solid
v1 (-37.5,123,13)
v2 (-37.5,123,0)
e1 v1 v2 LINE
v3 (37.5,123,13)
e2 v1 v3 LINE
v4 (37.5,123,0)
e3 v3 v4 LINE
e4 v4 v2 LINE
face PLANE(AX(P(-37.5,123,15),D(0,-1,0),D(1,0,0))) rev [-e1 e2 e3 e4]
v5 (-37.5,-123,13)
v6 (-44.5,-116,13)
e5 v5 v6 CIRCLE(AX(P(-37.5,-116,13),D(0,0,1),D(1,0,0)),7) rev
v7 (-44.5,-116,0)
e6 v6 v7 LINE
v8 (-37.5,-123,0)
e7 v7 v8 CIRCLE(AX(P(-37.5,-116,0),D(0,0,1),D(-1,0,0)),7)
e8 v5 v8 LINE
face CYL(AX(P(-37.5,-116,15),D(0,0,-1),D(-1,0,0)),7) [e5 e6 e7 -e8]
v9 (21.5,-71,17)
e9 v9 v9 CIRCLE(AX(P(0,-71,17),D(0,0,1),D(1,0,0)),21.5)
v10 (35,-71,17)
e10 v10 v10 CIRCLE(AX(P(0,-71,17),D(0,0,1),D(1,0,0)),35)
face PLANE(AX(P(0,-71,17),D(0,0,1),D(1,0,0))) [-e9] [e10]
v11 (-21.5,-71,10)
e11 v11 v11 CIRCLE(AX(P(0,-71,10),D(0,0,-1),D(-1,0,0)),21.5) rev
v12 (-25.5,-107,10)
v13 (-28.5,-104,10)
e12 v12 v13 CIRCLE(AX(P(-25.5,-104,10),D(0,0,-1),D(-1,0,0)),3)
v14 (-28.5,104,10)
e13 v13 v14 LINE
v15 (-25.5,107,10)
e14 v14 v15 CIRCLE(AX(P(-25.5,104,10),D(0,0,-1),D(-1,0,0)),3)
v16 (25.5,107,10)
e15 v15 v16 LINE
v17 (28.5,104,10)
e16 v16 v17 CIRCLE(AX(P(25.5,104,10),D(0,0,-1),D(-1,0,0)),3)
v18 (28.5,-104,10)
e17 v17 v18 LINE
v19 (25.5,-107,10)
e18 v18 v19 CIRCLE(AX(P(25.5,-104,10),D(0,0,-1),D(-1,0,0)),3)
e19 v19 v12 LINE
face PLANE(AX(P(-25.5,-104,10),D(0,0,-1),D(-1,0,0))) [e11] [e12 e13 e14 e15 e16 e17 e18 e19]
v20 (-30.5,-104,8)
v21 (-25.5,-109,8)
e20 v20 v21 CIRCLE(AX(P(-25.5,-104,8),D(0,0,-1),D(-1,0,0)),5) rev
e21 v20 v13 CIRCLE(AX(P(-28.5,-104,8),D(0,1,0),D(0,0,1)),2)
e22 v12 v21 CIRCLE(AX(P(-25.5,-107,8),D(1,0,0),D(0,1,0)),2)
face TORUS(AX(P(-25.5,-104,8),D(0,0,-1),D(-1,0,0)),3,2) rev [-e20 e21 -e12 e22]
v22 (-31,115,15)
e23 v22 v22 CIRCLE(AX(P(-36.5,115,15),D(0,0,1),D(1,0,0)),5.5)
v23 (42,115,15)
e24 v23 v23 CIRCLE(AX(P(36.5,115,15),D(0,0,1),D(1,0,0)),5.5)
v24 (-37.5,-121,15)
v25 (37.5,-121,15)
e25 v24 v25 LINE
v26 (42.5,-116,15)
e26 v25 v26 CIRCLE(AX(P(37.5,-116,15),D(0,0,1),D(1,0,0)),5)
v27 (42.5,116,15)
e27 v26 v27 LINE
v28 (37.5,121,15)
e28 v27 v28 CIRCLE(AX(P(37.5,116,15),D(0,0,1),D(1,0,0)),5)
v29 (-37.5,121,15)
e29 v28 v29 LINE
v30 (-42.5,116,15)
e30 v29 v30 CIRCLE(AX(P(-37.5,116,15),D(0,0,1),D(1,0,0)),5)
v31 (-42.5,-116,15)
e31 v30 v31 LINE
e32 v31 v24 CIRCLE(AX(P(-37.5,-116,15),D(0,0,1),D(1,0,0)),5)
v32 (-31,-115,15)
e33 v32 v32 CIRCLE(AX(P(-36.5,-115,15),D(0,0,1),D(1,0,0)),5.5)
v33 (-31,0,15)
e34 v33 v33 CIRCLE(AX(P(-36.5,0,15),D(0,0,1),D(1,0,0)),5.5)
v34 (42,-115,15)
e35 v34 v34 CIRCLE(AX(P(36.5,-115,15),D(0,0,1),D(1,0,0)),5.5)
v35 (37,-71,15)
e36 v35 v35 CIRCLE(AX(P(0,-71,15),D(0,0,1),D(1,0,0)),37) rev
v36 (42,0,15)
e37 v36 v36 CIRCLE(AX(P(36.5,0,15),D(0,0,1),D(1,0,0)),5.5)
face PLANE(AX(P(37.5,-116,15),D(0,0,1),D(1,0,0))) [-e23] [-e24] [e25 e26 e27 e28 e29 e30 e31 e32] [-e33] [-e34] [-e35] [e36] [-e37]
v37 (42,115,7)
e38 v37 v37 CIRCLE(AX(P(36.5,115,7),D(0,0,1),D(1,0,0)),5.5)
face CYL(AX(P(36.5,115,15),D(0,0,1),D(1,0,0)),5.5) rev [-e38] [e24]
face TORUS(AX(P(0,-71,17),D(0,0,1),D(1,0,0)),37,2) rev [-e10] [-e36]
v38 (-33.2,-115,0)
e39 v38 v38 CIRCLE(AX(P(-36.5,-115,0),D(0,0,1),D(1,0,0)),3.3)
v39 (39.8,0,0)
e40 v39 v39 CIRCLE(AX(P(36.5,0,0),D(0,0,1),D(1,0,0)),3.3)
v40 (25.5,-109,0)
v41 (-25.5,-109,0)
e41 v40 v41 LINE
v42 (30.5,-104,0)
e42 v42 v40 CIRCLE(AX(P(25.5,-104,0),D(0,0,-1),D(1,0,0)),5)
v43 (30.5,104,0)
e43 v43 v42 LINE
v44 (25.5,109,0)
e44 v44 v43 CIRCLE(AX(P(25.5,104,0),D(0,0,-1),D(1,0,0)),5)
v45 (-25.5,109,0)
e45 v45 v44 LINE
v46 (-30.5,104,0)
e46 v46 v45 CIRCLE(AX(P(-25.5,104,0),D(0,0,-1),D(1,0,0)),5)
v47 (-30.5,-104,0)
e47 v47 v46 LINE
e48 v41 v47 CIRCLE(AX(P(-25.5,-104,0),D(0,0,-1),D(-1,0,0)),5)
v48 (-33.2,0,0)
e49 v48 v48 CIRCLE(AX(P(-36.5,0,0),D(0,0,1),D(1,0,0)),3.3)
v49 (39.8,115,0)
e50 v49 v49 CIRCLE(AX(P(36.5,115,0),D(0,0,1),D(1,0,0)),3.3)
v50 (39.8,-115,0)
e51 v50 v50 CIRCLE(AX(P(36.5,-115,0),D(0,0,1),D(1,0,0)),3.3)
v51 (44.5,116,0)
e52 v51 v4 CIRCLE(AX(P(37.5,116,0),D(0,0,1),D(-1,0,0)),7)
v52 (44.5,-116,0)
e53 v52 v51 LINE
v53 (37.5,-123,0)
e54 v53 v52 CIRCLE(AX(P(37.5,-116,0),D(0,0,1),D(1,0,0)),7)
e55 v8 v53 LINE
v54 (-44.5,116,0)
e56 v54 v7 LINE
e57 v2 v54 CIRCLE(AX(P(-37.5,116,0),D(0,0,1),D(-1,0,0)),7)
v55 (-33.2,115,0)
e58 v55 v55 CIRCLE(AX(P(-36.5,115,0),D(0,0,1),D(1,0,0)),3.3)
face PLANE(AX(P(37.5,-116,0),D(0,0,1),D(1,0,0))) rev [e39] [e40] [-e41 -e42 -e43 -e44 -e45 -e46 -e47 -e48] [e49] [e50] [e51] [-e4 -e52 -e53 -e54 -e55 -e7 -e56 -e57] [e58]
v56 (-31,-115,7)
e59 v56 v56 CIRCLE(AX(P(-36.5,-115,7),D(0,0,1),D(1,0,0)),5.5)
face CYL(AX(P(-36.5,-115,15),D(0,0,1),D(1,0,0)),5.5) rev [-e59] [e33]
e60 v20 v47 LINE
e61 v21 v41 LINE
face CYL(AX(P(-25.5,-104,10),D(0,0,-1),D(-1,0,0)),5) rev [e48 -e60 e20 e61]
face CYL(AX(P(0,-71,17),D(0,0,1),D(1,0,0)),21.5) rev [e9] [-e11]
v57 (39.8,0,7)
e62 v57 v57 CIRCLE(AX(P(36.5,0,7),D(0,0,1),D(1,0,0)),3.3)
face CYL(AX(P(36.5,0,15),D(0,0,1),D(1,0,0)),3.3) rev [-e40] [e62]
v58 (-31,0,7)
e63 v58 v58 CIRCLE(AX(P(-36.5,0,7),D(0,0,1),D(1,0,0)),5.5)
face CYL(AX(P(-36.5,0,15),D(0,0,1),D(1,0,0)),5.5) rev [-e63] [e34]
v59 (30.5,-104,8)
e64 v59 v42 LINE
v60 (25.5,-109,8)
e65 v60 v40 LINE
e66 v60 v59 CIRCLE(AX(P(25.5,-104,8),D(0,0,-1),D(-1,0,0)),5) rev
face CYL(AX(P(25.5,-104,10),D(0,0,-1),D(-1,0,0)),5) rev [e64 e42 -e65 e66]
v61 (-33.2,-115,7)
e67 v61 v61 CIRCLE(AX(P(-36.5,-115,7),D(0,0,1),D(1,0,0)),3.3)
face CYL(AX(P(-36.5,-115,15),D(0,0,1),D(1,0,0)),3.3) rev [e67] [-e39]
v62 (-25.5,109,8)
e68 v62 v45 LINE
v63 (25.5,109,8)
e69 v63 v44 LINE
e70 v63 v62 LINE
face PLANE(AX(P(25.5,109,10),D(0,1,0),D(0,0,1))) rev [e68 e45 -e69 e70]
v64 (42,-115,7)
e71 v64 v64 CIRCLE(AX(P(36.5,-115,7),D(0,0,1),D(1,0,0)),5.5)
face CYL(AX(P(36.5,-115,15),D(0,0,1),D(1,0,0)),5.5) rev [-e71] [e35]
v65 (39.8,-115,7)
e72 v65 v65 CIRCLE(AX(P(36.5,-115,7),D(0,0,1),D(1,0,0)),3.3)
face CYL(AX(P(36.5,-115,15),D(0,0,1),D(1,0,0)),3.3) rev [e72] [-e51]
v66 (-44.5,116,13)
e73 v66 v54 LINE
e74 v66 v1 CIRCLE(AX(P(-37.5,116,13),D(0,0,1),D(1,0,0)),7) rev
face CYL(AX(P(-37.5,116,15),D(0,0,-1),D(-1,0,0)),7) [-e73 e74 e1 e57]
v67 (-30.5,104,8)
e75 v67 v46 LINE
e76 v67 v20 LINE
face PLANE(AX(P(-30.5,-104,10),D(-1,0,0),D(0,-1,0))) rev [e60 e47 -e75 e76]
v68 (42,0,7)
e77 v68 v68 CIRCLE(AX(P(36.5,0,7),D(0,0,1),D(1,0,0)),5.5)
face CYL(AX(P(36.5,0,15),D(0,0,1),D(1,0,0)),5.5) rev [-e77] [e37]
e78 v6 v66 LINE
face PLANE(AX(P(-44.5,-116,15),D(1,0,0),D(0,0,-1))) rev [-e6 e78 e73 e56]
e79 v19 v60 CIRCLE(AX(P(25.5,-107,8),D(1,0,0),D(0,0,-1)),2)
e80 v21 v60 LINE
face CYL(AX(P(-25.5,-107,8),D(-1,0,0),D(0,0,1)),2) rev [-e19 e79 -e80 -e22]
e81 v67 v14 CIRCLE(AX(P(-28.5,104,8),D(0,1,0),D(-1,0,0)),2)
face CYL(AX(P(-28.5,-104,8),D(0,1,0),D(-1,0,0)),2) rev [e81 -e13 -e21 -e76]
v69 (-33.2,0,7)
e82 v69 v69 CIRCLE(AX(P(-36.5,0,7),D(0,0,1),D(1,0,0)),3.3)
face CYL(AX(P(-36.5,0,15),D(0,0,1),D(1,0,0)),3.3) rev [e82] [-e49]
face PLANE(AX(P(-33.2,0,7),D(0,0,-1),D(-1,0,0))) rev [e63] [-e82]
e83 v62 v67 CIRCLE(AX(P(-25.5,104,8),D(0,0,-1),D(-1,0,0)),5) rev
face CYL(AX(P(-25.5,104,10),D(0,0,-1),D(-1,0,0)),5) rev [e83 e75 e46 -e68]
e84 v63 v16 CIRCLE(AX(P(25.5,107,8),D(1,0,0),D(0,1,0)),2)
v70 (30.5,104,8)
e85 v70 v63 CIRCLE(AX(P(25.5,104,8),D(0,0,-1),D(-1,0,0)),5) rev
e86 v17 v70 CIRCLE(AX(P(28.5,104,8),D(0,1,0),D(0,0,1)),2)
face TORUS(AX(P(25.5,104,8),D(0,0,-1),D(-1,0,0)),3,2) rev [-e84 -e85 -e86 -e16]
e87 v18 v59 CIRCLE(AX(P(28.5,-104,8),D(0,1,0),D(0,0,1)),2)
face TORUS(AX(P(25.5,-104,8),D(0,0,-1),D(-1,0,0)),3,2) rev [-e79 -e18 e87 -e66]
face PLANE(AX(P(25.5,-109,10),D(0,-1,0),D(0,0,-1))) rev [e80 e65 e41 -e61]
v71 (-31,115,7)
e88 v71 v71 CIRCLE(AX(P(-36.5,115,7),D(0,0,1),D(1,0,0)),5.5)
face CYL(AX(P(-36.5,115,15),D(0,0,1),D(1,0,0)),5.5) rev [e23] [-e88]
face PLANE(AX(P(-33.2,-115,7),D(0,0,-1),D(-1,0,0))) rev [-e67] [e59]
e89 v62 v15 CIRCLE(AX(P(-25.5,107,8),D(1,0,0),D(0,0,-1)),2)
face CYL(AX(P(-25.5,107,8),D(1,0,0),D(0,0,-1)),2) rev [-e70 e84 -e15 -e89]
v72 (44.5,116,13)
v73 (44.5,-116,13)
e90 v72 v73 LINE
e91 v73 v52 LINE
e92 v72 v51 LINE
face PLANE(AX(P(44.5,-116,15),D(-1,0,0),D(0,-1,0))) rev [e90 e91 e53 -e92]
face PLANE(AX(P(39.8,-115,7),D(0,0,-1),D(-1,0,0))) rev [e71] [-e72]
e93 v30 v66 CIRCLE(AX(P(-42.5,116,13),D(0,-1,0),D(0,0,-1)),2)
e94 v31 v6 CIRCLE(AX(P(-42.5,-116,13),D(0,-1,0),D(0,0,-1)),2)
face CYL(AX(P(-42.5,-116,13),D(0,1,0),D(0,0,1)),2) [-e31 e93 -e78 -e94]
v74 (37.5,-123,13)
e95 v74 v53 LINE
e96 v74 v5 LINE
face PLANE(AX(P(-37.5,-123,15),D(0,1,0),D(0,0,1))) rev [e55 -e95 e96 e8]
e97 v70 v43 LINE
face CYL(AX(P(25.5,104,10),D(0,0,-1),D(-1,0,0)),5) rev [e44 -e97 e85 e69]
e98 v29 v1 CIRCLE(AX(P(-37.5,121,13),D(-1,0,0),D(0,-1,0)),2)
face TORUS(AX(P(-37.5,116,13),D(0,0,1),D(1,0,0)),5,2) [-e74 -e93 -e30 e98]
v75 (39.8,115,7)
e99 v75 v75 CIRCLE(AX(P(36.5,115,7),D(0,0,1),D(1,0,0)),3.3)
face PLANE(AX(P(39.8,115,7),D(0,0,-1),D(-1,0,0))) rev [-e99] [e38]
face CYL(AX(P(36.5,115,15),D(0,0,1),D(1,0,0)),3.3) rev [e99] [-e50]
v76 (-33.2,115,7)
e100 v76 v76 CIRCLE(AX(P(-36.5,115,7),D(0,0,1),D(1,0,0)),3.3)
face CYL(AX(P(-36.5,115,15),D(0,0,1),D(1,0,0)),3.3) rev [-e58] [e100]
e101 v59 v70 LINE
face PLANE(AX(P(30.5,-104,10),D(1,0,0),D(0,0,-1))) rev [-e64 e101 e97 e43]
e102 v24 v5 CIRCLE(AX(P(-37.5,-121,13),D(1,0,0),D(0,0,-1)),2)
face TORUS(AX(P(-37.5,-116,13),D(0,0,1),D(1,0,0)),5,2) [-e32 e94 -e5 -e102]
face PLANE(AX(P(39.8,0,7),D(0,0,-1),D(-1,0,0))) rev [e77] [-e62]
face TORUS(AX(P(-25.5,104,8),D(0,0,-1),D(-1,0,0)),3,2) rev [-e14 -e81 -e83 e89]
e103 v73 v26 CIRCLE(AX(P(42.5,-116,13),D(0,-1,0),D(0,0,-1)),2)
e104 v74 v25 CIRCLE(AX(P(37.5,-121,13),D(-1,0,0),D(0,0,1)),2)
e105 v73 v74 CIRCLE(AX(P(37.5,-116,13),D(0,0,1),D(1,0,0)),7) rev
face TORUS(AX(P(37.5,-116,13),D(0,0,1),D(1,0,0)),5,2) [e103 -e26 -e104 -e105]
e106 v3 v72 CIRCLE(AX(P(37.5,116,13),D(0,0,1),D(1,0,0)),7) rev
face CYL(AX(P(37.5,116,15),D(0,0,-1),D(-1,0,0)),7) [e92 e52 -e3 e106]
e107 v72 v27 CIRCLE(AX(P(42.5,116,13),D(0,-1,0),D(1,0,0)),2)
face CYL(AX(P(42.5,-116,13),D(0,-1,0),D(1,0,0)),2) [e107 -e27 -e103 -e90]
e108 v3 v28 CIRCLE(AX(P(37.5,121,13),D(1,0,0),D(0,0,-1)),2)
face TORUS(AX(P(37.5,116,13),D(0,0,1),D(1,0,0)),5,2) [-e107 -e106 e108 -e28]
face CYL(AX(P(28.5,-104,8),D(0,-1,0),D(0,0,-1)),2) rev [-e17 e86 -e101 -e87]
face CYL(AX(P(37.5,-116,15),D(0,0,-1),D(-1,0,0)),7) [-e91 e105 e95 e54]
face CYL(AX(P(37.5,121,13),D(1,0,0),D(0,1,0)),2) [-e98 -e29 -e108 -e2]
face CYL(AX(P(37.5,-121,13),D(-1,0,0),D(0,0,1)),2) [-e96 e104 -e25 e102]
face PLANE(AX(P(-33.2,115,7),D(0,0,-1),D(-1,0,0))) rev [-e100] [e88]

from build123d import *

# Parameters (mm, degrees)
EXTRUDE_1_DEPTH           = 15
SKETCH_2_R                = 35
EXTRUDE_2_DEPTH           = 2
FILLET_1_R                = 2
HOLE_WIZARD_M48_1_D       = 43
CUT_EXTRUDE_1_DEPTH       = 10
FILLET_2_R                = 2
HOLE_START                = 7
HOLE_WIZARD_1_OUTLINE_R   = 5.5
HOLE_WIZARD_1_DEPTH       = 8
HOLE_WIZARD_1_2_OUTLINE_R = 3.3
HOLE_WIZARD_1_2_DEPTH     = 7


# Read off the part's stored shape, not the designer's step: 孔1
with BuildPart() as part:
    # 草图1 → 凸台-拉伸1 (new body)
    with BuildSketch(Plane.XY):
        with BuildLine():
            Line((-37.5, -123), (37.5, -123))
            ThreePointArc((37.5, -123), (42.449747468, -120.949747468), (44.5, -116))
            Line((44.5, -116), (44.5, 116))
            ThreePointArc((44.5, 116), (42.449747468, 120.949747468), (37.5, 123))
            Line((37.5, 123), (-37.5, 123))
            ThreePointArc((-37.5, 123), (-42.449747468, 120.949747468), (-44.5, 116))
            Line((-44.5, 116), (-44.5, -116))
            ThreePointArc((-44.5, -116), (-42.449747468, -120.949747468), (-37.5, -123))
        make_face()
    extrude(amount=EXTRUDE_1_DEPTH)

    # 草图2 → 凸台-拉伸2 (add)
    with BuildSketch(Plane.XY.offset(15)):
        with Locations((0, -71)):
            Circle(SKETCH_2_R)
    extrude(amount=EXTRUDE_2_DEPTH)

    # 圆角1
    fillet_1_edges = [part.edges().sort_by_distance(p)[0] for p in [
        (42.449747468, 120.949747468, 15),
        (0, 123, 15),
        (-42.449747468, 120.949747468, 15),
        (-44.5, 0, 15),
        (-35, -71, 15),
        (-42.449747468, -120.949747468, 15),
        (0, -123, 15),
        (42.449747468, -120.949747468, 15),
        (44.5, 0, 15),
    ]]
    fillet(fillet_1_edges, radius=FILLET_1_R - 0.0001)  # a hair under: the kernel refuses the full size

    # M48 螺纹孔1 (through all)
    with Locations(Plane.XY.offset(17)):
        with Locations((0, -71)):
            Hole(HOLE_WIZARD_M48_1_D / 2)

    # 草图5 → 切除-拉伸1 (cut)
    with BuildSketch(Plane(origin=(0, 0, 0), x_dir=(-1, 0, 0), z_dir=(0, 0, -1))):
        with BuildLine():
            Line((-25.5, -109), (25.5, -109))
            ThreePointArc((25.5, -109), (29.035533906, -107.535533906), (30.5, -104))
            Line((30.5, -104), (30.5, 104))
            ThreePointArc((30.5, 104), (29.035533906, 107.535533906), (25.5, 109))
            Line((25.5, 109), (-25.5, 109))
            ThreePointArc((-25.5, 109), (-29.035533906, 107.535533906), (-30.5, 104))
            Line((-30.5, 104), (-30.5, -104))
            ThreePointArc((-30.5, -104), (-29.035533906, -107.535533906), (-25.5, -109))
        make_face()
    extrude(amount=-CUT_EXTRUDE_1_DEPTH, mode=Mode.SUBTRACT)

    # 圆角2
    fillet_2_edges = [part.edges().sort_by_distance(p)[0] for p in [
        (-29.035533906, -107.535533906, 10),
        (0, -109, 10),
        (29.035533906, -107.535533906, 10),
        (30.5, 0, 10),
        (29.035533906, 107.535533906, 10),
        (0, 109, 10),
        (-29.035533906, 107.535533906, 10),
        (-30.5, 0, 10),
    ]]
    fillet(fillet_2_edges, radius=FILLET_2_R)

    # 孔1 outline → 孔1 (cut)
    with BuildSketch(Plane.XY.offset(HOLE_START)):
        with Locations((36.5, 0)):
            Circle(HOLE_WIZARD_1_OUTLINE_R)
        with Locations((-36.5, 0)):
            Circle(HOLE_WIZARD_1_OUTLINE_R)
        with Locations((36.5, -115)):
            Circle(HOLE_WIZARD_1_OUTLINE_R)
        with Locations((-36.5, 115)):
            Circle(HOLE_WIZARD_1_OUTLINE_R)
        with Locations((-36.5, -115)):
            Circle(HOLE_WIZARD_1_OUTLINE_R)
        with Locations((36.5, 115)):
            Circle(HOLE_WIZARD_1_OUTLINE_R)
    extrude(amount=HOLE_WIZARD_1_DEPTH, mode=Mode.SUBTRACT)

    # Hole Wizard 1 2 outline → Hole Wizard 1 2 (cut)
    with BuildSketch(Plane.XY):
        with Locations((36.5, 0)):
            Circle(HOLE_WIZARD_1_2_OUTLINE_R)
        with Locations((-36.5, 0)):
            Circle(HOLE_WIZARD_1_2_OUTLINE_R)
        with Locations((36.5, -115)):
            Circle(HOLE_WIZARD_1_2_OUTLINE_R)
        with Locations((-36.5, 115)):
            Circle(HOLE_WIZARD_1_2_OUTLINE_R)
        with Locations((-36.5, -115)):
            Circle(HOLE_WIZARD_1_2_OUTLINE_R)
        with Locations((36.5, 115)):
            Circle(HOLE_WIZARD_1_2_OUTLINE_R)
    extrude(amount=HOLE_WIZARD_1_2_DEPTH, mode=Mode.SUBTRACT)


solid = part.part
